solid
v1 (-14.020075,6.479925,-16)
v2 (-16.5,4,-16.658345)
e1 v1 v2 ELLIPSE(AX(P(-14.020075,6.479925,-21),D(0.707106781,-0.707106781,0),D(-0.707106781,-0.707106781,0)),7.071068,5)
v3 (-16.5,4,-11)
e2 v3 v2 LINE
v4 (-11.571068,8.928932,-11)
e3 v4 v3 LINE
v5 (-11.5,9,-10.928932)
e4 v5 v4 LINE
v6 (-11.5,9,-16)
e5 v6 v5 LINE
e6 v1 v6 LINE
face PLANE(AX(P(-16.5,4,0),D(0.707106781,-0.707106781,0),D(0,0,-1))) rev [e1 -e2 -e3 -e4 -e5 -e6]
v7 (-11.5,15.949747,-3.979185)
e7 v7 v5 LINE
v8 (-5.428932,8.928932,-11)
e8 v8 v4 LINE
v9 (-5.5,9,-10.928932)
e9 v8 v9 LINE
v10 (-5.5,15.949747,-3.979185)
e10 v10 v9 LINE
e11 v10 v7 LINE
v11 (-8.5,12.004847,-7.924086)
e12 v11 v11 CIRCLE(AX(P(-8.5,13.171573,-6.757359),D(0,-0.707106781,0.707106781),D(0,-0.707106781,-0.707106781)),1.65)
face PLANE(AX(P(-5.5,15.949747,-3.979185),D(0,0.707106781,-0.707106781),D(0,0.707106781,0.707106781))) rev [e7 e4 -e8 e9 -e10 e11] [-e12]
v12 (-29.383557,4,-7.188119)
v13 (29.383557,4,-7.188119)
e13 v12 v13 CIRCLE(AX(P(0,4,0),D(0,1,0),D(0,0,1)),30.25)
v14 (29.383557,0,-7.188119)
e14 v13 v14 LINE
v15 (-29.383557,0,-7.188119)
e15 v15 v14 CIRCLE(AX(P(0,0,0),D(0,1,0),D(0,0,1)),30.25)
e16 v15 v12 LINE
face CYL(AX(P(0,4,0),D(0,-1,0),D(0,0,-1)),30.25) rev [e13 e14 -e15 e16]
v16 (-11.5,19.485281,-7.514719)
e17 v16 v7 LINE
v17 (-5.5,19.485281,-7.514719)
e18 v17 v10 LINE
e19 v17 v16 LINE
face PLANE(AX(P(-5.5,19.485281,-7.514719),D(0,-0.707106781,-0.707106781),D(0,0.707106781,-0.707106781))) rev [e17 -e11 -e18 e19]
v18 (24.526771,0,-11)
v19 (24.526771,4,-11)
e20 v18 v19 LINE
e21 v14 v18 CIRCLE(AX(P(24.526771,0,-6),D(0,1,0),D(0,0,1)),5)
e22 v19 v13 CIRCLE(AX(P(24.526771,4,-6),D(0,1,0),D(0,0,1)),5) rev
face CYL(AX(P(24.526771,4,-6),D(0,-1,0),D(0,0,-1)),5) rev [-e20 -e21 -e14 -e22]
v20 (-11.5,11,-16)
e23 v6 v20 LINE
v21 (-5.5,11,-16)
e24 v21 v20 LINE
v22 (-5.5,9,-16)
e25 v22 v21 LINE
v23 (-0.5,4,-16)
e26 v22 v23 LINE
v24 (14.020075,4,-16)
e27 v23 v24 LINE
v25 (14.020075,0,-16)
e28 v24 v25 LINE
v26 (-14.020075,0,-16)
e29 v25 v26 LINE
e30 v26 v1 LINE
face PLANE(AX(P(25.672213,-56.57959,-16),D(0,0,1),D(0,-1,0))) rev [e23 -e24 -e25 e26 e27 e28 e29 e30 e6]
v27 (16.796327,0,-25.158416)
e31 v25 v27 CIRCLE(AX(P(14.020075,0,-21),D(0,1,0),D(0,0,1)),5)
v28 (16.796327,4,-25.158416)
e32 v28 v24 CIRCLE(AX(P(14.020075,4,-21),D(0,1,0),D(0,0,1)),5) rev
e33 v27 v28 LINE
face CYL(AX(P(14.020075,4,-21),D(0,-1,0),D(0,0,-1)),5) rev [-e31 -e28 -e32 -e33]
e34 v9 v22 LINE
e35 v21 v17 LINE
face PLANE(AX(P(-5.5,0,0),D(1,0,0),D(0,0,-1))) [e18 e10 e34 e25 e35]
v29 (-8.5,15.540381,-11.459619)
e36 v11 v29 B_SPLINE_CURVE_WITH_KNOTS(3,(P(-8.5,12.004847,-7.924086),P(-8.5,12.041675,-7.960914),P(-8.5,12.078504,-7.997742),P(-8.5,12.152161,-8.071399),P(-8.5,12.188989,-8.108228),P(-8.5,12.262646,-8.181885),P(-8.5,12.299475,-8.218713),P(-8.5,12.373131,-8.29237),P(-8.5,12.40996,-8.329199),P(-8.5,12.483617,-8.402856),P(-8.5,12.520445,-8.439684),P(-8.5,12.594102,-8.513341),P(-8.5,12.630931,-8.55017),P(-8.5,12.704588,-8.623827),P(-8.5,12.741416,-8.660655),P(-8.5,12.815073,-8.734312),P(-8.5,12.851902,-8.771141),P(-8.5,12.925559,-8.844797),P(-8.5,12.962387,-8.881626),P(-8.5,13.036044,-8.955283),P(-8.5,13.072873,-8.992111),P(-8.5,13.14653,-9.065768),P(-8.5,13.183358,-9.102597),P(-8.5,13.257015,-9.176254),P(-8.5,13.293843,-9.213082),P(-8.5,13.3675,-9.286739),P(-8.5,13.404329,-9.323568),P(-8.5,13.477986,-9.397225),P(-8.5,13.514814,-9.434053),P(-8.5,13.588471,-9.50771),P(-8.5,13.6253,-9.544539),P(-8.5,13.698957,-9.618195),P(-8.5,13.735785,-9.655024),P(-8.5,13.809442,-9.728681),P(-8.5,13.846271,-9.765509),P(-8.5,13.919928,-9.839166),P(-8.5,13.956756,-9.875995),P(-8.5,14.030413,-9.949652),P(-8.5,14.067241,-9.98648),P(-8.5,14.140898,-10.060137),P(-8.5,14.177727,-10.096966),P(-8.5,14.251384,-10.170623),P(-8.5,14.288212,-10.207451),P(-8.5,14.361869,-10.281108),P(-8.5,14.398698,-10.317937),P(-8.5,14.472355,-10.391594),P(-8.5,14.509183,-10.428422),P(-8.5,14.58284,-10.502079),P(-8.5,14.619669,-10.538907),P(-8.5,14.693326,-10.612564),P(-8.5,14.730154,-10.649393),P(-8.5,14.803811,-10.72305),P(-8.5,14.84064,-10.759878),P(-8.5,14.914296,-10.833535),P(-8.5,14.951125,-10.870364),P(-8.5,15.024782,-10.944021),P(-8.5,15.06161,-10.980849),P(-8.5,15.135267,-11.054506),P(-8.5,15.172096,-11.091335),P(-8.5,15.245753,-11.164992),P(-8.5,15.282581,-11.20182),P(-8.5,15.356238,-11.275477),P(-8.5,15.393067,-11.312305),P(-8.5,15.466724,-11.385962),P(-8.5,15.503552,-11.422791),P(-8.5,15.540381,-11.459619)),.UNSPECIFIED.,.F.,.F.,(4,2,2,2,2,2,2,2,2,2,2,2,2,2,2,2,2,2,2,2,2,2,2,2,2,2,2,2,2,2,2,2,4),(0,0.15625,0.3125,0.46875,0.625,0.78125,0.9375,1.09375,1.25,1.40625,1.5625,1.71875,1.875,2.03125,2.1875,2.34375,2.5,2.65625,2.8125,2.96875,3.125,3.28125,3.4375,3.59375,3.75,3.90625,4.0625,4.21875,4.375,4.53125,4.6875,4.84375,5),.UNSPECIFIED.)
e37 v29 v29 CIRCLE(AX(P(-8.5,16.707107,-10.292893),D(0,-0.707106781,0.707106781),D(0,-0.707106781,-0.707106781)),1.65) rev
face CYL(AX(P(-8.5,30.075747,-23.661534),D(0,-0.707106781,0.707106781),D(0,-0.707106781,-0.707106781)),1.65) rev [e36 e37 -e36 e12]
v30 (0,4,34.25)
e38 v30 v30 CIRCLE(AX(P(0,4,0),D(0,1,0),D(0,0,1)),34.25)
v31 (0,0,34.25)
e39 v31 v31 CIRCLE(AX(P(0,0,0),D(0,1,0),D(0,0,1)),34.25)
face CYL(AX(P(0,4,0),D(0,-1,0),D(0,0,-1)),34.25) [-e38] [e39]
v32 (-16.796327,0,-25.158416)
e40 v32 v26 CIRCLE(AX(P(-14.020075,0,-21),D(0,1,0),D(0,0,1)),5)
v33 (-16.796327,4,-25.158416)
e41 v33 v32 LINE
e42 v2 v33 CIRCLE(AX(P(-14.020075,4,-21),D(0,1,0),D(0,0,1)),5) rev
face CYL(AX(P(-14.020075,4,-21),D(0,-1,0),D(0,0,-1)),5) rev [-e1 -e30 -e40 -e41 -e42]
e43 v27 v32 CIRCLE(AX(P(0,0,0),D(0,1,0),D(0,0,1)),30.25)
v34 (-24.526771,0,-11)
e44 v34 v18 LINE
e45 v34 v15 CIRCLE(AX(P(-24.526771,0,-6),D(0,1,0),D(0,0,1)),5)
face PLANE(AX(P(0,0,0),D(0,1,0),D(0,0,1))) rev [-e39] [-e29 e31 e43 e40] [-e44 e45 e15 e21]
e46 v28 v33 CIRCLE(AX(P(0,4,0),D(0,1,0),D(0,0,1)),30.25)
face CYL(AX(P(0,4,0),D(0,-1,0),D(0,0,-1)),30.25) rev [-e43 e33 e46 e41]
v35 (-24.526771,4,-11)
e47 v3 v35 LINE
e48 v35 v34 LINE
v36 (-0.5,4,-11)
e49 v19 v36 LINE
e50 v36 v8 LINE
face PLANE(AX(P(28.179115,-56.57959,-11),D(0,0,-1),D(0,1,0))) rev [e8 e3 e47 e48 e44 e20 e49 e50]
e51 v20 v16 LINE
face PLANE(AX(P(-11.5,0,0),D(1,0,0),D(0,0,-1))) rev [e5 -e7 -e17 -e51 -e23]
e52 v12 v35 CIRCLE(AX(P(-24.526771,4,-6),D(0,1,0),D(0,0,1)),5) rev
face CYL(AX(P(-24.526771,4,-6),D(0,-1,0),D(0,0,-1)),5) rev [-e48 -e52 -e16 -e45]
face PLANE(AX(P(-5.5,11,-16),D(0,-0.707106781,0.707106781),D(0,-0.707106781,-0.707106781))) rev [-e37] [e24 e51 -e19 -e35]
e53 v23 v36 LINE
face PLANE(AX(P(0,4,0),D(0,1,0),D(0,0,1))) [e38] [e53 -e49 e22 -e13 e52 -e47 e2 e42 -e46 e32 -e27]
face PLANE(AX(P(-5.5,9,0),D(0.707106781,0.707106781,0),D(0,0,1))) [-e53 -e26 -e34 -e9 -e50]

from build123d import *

# Parameters (mm, degrees)
SKETCH1_R           = 34.25
SKETCH1_R_2         = 30.25
BOSS_EXTRUDE1_DEPTH = 4
BOSS_EXTRUDE2_START = -11.5
BOSS_EXTRUDE2_DEPTH = 6
BOSS_EXTRUDE3_START = 4
BOSS_EXTRUDE3_DEPTH = 4
CHAMFER1_SIZE       = 5
FILLET1_R           = 5
CUT_EXTRUDE2_REACH  = 58.809
SKETCH6_R           = 1.65


with BuildPart() as part:
    # Sketch1 → Boss-Extrude1 (new body)
    with BuildSketch(Plane(origin=(0, 0, 0), x_dir=(1, 0, 0), z_dir=(0, 1, 0))):
        with Locations(Location((0, 0, 0), (0, 0, 270))):
            Circle(SKETCH1_R)
        with Locations(Location((0, 0, 0), (0, 0, 270))):
            Circle(SKETCH1_R_2, mode=Mode.SUBTRACT)
    extrude(amount=BOSS_EXTRUDE1_DEPTH)



with BuildPart() as body_2:
    # Sketch2 → Boss-Extrude2 (new body)
    with BuildSketch(Plane(origin=(0, 0, 0), x_dir=(0, 0, -1), z_dir=(1, 0, 0)).offset(BOSS_EXTRUDE2_START)):
        Polygon((3.97918472, 15.949747468), (11, 8.928932188), (11, 4), (16, 4), (16, 11), (7.514718626, 19.485281374), align=None)
    extrude(amount=BOSS_EXTRUDE2_DEPTH)


with BuildPart() as part_1:
    add(part.part)

    add(body_2.part)  # Boss-Extrude3 merges body 2
    # Sketch5 → Boss-Extrude3 (add)
    with BuildSketch(Plane.XZ.offset(-4).offset(BOSS_EXTRUDE3_START)):
        with BuildLine():
            Line((28.179114606, -11), (-28.179114606, -11))
            ThreePointArc((-28.179114606, -11), (-27.041474823, -13.558065475), (-25.672212604, -16))
            Line((-25.672212604, -16), (25.672212604, -16))
            ThreePointArc((25.672212604, -16), (27.041474823, -13.558065475), (28.179114606, -11))
        make_face()
    extrude(amount=-BOSS_EXTRUDE3_DEPTH)

    # Chamfer1
    # the kernel refuses this chamfer: 5 mm, written as the material it adds along each edge
    with BuildSketch(Plane(origin=(-11.5, 4, 1.85841494), x_dir=(-0.9996219169112968, -0.027495876610586403, 0), z_dir=(0, 0, -1))) as chamfer1_piece_1_section:
        Polygon((CHAMFER1_SIZE * 0.999621916911, CHAMFER1_SIZE * 0.0274958766106), (-CHAMFER1_SIZE * 0.0274958766106, CHAMFER1_SIZE * 0.999621916911), (0, 0), align=None)
    chamfer1_piece_1 = extrude(amount=17.85841494, mode=Mode.PRIVATE)
    chamfer1_piece_1 = split(chamfer1_piece_1, bisect_by=Plane(origin=(-11.354428767, 9.056622431, -11), z_dir=(0, 0, 1)), keep=Keep.TOP, mode=Mode.PRIVATE)
    chamfer1_piece_1 = split(chamfer1_piece_1, bisect_by=Plane(origin=(-11.354428767, 9.02469987, -10.904232318), z_dir=(0, 0.7071067811865489, -0.7071067811865462)), keep=Keep.TOP, mode=Mode.PRIVATE)
    add(chamfer1_piece_1)
    with BuildSketch(Plane(origin=(-11.5, 4, -11), x_dir=(-0.9996219169112968, -0.027495876610586924, 0), z_dir=(0, 0, -1))) as chamfer1_piece_2_section:
        Polygon((CHAMFER1_SIZE * 0.999621916911, CHAMFER1_SIZE * 0.0274958766106), (-CHAMFER1_SIZE * 0.0274958766106, CHAMFER1_SIZE * 0.999621916911), (0, 0), align=None)
    chamfer1_piece_2 = extrude(amount=5, mode=Mode.PRIVATE)
    chamfer1_piece_2 = split(chamfer1_piece_2, bisect_by=Plane(origin=(-13.406884942, 6.106803662, -13.822128526), z_dir=(0, -0.7071067811865489, 0.7071067811865462)), keep=Keep.TOP, mode=Mode.PRIVATE)
    add(chamfer1_piece_2)
    with BuildSketch(Plane(origin=(-11.5, 4, -11), x_dir=(-0.9996219169112968, -0.027495876610586924, 0), z_dir=(0, 0, -1))) as chamfer1_piece_3_section:
        Polygon((CHAMFER1_SIZE * 0.999621916911, CHAMFER1_SIZE * 0.0274958766106), (-CHAMFER1_SIZE * 0.0274958766106, CHAMFER1_SIZE * 0.999621916911), (0, 0), align=None)
    chamfer1_piece_3 = extrude(amount=5, mode=Mode.PRIVATE)
    chamfer1_piece_3 = split(chamfer1_piece_3, bisect_by=Plane(origin=(-12.657418843, 5.909631949, -14.019300239), z_dir=(0, 0.7071067811865489, -0.7071067811865462)), keep=Keep.TOP, mode=Mode.PRIVATE)
    add(chamfer1_piece_3)
    with BuildSketch(Plane(origin=(-5.5, 4, 1.85841494), x_dir=(0.9996219169112968, -0.027495876610586403, 0), z_dir=(0, 0, -1))) as chamfer1_piece_4_section:
        Polygon((CHAMFER1_SIZE * 0.999621916911, -CHAMFER1_SIZE * 0.0274958766106), (-CHAMFER1_SIZE * 0.0274958766106, -CHAMFER1_SIZE * 0.999621916911), (0, 0), align=None)
    chamfer1_piece_4 = extrude(amount=17.85841494, mode=Mode.PRIVATE)
    chamfer1_piece_4 = split(chamfer1_piece_4, bisect_by=Plane(origin=(-5.645571233, 9.056622431, -11), z_dir=(0, 0, 1)), keep=Keep.TOP, mode=Mode.PRIVATE)
    chamfer1_piece_4 = split(chamfer1_piece_4, bisect_by=Plane(origin=(-5.645571233, 9.02469987, -10.904232318), z_dir=(0, 0.7071067811865489, -0.7071067811865462)), keep=Keep.TOP, mode=Mode.PRIVATE)
    add(chamfer1_piece_4)
    with BuildSketch(Plane(origin=(-5.5, 4, -11), x_dir=(0.9996219169112968, -0.027495876610586924, 0), z_dir=(0, 0, -1))) as chamfer1_piece_5_section:
        Polygon((CHAMFER1_SIZE * 0.999621916911, -CHAMFER1_SIZE * 0.0274958766106), (-CHAMFER1_SIZE * 0.0274958766106, -CHAMFER1_SIZE * 0.999621916911), (0, 0), align=None)
    chamfer1_piece_5 = extrude(amount=5, mode=Mode.PRIVATE)
    chamfer1_piece_5 = split(chamfer1_piece_5, bisect_by=Plane(origin=(-3.593115058, 6.106803662, -13.822128526), z_dir=(0, -0.7071067811865489, 0.7071067811865462)), keep=Keep.TOP, mode=Mode.PRIVATE)
    add(chamfer1_piece_5)
    with BuildSketch(Plane(origin=(-5.5, 4, -11), x_dir=(0.9996219169112968, -0.027495876610586924, 0), z_dir=(0, 0, -1))) as chamfer1_piece_6_section:
        Polygon((CHAMFER1_SIZE * 0.999621916911, -CHAMFER1_SIZE * 0.0274958766106), (-CHAMFER1_SIZE * 0.0274958766106, -CHAMFER1_SIZE * 0.999621916911), (0, 0), align=None)
    chamfer1_piece_6 = extrude(amount=5, mode=Mode.PRIVATE)
    chamfer1_piece_6 = split(chamfer1_piece_6, bisect_by=Plane(origin=(-4.342581157, 5.909631949, -14.019300239), z_dir=(0, 0.7071067811865489, -0.7071067811865462)), keep=Keep.TOP, mode=Mode.PRIVATE)
    add(chamfer1_piece_6)

    # Fillet1
    fillet1_edges = [part_1.edges().sort_by_distance(p)[0] for p in [
        (-25.672212604, 2, -16),
        (-28.179114606, 2, -11),
        (28.179114606, 2, -11),
        (25.672212604, 2, -16),
    ]]
    fillet(fillet1_edges, radius=FILLET1_R)

    # Sketch6 → Cut-Extrude2 (cut, up to next)
    with BuildSketch(Plane(origin=(0, 9.964466094, -9.964466094), x_dir=(1, 0, 0), z_dir=(0, -0.7071067811865487, 0.7071067811865464)), mode=Mode.PRIVATE) as cut_extrude2_sk1:
        with Locations(Location((-8.5, 4.535533906, 0), (0, 0, 270))):
            Circle(SKETCH6_R)
    cut_extrude2_tool1 = extrude(cut_extrude2_sk1.sketch, amount=-CUT_EXTRUDE2_REACH, mode=Mode.PRIVATE) & part_1.part
    add(cut_extrude2_tool1.solids().sort_by_distance((-8.5, 13.171573, -6.757359))[0], mode=Mode.SUBTRACT)


solid = part_1.part
